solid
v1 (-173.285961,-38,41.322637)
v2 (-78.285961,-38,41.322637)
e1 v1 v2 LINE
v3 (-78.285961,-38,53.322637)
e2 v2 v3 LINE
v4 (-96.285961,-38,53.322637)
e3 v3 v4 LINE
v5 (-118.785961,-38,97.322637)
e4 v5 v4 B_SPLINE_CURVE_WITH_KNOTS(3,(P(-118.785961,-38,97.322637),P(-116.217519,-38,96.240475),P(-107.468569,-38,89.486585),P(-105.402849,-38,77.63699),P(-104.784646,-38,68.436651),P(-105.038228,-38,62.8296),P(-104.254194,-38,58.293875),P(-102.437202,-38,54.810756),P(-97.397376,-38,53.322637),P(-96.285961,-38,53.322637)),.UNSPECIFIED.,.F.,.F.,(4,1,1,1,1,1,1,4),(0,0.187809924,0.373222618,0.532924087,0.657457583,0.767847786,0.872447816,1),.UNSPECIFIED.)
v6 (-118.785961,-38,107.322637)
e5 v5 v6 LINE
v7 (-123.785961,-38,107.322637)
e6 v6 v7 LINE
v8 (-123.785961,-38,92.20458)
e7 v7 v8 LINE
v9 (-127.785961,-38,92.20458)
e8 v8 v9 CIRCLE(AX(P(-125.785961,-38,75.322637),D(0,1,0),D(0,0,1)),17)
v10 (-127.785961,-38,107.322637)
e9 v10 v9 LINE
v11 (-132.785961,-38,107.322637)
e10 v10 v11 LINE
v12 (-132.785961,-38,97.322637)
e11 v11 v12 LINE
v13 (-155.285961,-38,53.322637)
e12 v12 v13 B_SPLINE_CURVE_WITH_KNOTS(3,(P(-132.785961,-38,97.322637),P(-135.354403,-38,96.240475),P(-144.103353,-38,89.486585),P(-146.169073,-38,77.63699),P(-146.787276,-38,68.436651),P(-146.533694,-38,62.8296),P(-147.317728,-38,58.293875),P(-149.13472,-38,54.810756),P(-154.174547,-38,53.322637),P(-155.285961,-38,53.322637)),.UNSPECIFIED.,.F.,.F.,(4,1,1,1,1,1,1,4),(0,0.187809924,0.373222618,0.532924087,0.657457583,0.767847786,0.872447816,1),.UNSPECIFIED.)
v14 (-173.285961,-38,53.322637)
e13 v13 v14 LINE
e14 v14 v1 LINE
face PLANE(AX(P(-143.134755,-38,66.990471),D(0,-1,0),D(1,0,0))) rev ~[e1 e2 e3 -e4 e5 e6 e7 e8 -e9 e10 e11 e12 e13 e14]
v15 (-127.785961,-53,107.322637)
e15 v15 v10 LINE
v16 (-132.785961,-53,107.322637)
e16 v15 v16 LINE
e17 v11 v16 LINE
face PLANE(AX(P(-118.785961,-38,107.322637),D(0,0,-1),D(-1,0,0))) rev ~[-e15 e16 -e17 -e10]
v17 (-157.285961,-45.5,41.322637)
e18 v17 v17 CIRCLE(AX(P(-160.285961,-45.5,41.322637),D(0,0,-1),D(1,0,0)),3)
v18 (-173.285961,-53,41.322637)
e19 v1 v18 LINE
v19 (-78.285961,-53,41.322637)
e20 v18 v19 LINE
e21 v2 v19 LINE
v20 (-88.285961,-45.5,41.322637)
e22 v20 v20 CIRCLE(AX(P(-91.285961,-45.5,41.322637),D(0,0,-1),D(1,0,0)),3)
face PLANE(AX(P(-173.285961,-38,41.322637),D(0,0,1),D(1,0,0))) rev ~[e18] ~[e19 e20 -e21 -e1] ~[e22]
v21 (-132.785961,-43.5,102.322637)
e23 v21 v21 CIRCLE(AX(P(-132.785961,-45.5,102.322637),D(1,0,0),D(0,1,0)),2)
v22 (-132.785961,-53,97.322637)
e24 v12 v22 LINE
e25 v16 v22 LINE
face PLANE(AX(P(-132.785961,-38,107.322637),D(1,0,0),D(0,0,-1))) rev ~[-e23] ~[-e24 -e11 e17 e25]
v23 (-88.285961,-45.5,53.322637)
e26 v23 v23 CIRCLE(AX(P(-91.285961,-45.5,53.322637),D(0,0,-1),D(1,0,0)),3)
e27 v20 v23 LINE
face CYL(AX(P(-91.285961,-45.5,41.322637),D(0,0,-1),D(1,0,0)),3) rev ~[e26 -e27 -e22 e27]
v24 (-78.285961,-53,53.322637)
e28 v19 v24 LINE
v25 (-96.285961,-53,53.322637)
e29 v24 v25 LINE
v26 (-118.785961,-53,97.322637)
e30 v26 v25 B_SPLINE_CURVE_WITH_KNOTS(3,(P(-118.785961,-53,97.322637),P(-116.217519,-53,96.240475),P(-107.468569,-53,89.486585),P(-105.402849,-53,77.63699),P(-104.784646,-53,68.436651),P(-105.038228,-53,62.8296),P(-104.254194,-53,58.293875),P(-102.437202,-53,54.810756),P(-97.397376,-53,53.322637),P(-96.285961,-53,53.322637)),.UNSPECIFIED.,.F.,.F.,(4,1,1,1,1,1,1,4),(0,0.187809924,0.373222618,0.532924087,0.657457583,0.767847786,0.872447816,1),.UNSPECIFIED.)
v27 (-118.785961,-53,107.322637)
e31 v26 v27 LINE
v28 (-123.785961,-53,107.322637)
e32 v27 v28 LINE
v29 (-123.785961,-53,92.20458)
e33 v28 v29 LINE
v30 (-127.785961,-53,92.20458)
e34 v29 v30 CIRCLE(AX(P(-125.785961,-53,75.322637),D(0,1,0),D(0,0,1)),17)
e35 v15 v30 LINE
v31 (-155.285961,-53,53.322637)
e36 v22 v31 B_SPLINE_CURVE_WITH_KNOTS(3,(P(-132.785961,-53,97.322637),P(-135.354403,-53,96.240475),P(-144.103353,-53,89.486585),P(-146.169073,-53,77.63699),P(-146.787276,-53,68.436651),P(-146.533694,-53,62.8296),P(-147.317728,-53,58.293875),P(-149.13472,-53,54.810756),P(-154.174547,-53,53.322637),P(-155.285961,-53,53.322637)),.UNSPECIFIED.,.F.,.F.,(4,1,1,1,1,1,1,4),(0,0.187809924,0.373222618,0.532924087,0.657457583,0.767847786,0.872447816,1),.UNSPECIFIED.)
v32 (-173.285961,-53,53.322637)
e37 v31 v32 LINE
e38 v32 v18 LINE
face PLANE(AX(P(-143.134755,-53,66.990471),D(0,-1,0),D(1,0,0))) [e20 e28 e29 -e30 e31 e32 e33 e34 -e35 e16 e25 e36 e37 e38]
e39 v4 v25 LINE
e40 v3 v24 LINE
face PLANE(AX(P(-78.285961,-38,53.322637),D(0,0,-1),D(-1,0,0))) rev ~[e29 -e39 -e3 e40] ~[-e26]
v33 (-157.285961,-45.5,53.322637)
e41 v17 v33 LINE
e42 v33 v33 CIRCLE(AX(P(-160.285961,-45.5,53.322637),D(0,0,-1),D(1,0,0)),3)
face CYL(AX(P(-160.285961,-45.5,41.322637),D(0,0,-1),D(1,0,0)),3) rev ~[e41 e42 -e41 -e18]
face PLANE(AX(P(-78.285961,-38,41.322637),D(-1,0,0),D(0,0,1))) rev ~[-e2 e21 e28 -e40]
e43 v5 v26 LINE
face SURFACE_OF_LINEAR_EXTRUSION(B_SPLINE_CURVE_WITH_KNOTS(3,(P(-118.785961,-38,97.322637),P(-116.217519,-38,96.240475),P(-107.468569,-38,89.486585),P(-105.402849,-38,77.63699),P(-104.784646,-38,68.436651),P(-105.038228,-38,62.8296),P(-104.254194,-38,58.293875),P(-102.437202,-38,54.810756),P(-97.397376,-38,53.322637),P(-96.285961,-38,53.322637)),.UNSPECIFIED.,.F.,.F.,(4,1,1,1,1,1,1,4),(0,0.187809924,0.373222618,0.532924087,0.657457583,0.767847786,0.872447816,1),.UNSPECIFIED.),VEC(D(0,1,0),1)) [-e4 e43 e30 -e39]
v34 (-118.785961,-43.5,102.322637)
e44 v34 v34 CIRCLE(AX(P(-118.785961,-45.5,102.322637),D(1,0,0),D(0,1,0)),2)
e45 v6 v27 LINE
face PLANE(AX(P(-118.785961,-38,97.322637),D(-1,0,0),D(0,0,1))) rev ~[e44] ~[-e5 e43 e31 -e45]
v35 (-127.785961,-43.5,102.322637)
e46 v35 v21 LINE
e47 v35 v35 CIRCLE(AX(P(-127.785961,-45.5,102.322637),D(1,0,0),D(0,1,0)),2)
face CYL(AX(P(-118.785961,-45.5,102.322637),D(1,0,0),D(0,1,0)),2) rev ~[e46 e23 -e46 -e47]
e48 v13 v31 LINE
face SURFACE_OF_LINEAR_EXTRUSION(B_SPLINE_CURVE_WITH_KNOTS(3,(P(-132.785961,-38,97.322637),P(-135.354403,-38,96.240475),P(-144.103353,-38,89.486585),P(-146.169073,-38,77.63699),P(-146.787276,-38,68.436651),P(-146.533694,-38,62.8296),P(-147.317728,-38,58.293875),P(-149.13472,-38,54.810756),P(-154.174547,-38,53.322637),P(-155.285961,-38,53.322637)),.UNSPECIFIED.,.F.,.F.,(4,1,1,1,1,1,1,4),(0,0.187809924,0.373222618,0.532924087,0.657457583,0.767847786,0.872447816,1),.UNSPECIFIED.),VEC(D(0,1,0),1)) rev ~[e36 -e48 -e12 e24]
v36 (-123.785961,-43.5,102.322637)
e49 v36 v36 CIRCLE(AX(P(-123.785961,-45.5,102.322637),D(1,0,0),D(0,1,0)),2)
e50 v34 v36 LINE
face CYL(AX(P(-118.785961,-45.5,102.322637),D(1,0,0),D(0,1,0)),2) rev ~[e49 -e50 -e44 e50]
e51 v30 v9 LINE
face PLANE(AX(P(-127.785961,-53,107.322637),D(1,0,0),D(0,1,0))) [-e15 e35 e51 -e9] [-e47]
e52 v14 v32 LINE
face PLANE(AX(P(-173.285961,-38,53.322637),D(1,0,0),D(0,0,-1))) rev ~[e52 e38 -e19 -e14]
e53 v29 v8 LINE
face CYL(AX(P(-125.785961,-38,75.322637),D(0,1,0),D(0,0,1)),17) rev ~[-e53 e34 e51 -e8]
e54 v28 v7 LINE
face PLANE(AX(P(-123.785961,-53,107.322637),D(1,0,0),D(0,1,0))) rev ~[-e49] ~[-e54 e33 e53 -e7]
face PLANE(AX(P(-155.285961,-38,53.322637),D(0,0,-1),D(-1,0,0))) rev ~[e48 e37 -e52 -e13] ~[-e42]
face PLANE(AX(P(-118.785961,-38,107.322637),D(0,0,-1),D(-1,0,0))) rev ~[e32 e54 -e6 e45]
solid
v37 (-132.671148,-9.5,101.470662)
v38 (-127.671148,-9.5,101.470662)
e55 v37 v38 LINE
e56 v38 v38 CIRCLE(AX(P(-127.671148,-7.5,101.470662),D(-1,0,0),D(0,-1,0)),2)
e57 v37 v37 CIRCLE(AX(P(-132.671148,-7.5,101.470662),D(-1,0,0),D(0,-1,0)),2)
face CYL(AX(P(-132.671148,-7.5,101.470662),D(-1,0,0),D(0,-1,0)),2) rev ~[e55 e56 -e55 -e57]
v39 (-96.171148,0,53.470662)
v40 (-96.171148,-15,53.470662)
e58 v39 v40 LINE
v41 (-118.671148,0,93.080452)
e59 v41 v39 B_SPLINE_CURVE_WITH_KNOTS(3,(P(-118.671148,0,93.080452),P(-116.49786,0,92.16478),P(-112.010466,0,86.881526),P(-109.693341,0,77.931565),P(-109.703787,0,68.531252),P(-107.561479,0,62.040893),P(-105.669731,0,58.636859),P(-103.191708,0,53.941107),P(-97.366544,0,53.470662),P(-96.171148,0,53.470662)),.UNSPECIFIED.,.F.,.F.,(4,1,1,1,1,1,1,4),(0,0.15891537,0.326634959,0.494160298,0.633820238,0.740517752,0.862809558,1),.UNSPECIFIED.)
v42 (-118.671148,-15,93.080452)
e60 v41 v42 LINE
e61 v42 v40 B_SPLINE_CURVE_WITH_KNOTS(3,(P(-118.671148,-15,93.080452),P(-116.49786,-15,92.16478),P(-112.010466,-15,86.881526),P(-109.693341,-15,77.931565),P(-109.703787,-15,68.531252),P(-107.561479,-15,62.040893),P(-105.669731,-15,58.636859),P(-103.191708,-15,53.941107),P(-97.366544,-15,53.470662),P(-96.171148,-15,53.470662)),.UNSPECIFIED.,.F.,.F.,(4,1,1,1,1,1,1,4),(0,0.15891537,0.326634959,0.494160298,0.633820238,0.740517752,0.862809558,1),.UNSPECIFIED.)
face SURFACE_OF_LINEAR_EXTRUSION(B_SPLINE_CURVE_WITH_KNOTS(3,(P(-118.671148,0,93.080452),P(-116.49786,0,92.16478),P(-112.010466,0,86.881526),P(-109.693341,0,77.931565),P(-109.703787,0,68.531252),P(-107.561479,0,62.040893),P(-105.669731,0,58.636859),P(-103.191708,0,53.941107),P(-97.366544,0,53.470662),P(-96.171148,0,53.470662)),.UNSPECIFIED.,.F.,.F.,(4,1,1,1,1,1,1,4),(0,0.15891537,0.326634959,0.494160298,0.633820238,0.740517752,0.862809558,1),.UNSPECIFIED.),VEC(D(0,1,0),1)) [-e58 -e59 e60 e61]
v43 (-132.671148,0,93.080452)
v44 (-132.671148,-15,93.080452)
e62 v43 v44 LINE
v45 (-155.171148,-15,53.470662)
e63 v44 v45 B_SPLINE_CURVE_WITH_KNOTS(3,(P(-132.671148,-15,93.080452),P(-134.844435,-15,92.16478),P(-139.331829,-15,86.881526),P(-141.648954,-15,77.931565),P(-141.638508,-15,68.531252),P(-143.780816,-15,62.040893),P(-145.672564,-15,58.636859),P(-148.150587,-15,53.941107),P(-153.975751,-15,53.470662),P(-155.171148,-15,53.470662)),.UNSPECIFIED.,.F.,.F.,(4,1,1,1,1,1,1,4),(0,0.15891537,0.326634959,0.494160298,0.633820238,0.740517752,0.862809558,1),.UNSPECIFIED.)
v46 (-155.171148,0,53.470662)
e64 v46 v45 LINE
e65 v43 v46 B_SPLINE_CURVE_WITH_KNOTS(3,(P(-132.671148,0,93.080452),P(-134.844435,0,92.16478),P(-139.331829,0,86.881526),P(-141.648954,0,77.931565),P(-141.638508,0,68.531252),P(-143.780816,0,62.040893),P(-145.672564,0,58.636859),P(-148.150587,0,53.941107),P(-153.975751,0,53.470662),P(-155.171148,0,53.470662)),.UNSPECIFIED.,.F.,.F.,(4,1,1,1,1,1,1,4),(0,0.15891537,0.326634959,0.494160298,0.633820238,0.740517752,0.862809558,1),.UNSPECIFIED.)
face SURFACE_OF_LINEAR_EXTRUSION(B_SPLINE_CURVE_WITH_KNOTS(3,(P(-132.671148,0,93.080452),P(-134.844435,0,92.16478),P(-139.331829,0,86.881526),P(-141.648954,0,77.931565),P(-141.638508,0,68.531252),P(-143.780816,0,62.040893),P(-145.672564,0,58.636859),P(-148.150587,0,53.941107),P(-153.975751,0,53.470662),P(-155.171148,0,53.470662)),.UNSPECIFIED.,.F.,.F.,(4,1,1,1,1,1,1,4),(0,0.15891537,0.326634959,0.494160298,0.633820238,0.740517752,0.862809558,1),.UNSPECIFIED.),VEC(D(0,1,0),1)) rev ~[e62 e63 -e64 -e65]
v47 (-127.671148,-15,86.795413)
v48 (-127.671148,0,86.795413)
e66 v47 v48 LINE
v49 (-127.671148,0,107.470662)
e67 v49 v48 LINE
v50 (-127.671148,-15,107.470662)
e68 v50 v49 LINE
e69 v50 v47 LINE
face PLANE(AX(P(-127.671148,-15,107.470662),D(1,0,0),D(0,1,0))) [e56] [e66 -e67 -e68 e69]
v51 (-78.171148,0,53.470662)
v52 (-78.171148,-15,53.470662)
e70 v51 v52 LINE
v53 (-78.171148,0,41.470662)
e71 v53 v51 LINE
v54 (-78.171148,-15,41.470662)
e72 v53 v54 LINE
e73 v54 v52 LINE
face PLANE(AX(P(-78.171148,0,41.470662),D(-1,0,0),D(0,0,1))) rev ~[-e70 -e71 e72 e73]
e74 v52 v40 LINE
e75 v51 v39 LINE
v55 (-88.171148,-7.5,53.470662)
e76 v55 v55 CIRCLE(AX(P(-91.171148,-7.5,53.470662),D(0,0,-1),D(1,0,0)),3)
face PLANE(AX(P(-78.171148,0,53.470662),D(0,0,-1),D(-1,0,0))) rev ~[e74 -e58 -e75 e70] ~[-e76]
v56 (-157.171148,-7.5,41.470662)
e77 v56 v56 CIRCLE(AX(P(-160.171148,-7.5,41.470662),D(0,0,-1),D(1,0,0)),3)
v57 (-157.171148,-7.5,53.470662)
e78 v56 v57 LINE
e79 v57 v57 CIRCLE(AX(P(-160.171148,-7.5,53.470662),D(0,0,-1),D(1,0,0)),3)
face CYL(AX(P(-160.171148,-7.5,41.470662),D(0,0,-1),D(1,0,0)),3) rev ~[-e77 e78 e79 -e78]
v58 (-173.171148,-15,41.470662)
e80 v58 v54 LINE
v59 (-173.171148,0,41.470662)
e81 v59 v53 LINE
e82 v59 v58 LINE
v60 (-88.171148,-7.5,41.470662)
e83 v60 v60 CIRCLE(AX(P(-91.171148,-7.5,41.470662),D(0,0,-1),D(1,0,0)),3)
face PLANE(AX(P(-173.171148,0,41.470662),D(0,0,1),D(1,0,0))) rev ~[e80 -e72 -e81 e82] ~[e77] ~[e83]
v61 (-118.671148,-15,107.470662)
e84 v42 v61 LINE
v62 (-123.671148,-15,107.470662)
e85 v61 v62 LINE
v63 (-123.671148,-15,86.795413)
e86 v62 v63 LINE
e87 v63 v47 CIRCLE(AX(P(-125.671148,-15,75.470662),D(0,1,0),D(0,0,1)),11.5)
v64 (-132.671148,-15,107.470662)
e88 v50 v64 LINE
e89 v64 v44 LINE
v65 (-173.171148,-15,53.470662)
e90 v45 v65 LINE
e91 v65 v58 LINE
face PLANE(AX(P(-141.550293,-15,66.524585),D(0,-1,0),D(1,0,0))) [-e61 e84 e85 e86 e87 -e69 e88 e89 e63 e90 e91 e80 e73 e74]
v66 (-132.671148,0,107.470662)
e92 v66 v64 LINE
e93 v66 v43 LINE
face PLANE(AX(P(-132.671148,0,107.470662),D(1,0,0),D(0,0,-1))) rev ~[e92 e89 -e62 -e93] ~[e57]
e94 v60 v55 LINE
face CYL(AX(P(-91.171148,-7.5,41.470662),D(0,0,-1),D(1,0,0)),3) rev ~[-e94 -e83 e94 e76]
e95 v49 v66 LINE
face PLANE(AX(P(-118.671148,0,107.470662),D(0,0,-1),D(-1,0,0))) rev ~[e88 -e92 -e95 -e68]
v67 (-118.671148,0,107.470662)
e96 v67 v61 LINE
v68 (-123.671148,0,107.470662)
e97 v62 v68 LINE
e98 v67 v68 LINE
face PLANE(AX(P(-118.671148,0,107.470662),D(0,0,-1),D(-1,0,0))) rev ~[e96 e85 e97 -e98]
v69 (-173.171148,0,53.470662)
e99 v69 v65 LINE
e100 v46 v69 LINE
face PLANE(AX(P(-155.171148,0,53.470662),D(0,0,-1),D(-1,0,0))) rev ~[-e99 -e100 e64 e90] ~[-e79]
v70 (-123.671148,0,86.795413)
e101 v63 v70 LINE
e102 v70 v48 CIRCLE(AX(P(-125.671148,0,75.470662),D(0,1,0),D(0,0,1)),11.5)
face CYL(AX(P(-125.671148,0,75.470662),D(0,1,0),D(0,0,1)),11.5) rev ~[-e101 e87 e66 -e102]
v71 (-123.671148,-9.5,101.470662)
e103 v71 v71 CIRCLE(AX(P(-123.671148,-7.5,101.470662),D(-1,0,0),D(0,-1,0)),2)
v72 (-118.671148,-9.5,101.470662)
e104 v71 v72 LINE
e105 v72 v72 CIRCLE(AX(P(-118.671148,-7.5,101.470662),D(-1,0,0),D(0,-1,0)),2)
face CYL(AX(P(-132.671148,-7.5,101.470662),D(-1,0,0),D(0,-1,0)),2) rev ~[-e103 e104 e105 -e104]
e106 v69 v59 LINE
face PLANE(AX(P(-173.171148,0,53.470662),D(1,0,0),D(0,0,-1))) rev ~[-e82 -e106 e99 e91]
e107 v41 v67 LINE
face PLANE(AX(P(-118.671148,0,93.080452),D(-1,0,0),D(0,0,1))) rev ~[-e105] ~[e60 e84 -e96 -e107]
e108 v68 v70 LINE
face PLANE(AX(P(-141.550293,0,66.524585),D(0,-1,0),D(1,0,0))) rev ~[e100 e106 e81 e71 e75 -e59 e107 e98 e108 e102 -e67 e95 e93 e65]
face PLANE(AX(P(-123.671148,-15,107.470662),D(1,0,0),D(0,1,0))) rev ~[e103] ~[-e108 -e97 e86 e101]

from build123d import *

# Parameters (mm, degrees)
F1_DEPTH  = 15
F3_W      = 4
F3_H      = 15
F4_DEPTH  = 25
F5_R      = 3
F6_DEPTH  = 25
F7_R      = 2
F8_DEPTH  = 25
F10_DEPTH = 15
F11_R     = 3
F12_DEPTH = 25
F13_W     = 4
F13_H     = 15
F14_DEPTH = 25
F15_R     = 2
F16_DEPTH = 25


# Not quite as in the source:
# - a feature names something its author has since deleted; it is built from what else it names


with BuildPart() as f1:
    # F0 (on Front) → F1 (new body)
    with BuildSketch(Plane.XZ):
        with BuildLine():
            Line((-125.6711477041, 86.9706617594), (-125.6711477041, 107.4706617594))
            Line((-125.6711477041, 107.4706617594), (-132.6711477041, 107.4706617594))
            Line((-132.6711477041, 107.4706617594), (-132.6711477041, 93.0804520496))
            add(Edge.make_bspline(
                [(-132.6711477041, 93.0804520496), (-134.8444351683, 92.1647803788), (-139.3318293406, 86.8815258397), (-141.6489540104, 77.9315652386), (-141.6385080687, 68.53125191), (-143.7808164235, 62.0408932683), (-145.6725641316, 58.6368592184), (-148.1505873732, 53.9411069546), (-153.9757510035, 53.4706617594), (-155.1711477041, 53.4706617594)],
                knots=[0, 0, 0, 0, 0.1589153696, 0.3266349591, 0.4941602985, 0.6338202377, 0.7405177517, 0.8628095578, 1, 1, 1, 1], degree=3))
            Line((-155.1711477041, 53.4706617594), (-173.1711477041, 53.4706617594))
            Line((-173.1711477041, 53.4706617594), (-173.1711477041, 41.4706617594))
            Line((-173.1711477041, 41.4706617594), (-125.6711477041, 41.4706617594))
            Line((-125.6711477041, 41.4706617594), (-125.6711477041, 63.9706617594))
            ThreePointArc((-125.6711477041, 63.9706617594), (-137.1711477041, 75.4706617594), (-125.6711477041, 86.9706617594))
        make_face()
        with BuildLine():
            Line((-118.6711477041, 107.4706617594), (-125.6711477041, 107.4706617594))
            Line((-125.6711477041, 107.4706617594), (-125.6711477041, 86.9706617594))
            ThreePointArc((-125.6711477041, 86.9706617594), (-114.1711477041, 75.4706617594), (-125.6711477041, 63.9706617594))
            Line((-125.6711477041, 63.9706617594), (-125.6711477041, 41.4706617594))
            Line((-125.6711477041, 41.4706617594), (-78.1711477041, 41.4706617594))
            Line((-78.1711477041, 41.4706617594), (-78.1711477041, 53.4706617594))
            Line((-78.1711477041, 53.4706617594), (-96.1711477041, 53.4706617594))
            add(Edge.make_bspline(
                [(-118.6711477041, 93.0804520496), (-116.49786024, 92.1647803788), (-112.0104660676, 86.8815258397), (-109.6933413979, 77.9315652386), (-109.7037873395, 68.53125191), (-107.5614789847, 62.0408932683), (-105.6697312766, 58.6368592184), (-103.191708035, 53.9411069546), (-97.3665444048, 53.4706617594), (-96.1711477041, 53.4706617594)],
                knots=[0, 0, 0, 0, 0.1589153696, 0.3266349591, 0.4941602985, 0.6338202377, 0.7405177517, 0.8628095578, 1, 1, 1, 1], degree=3))
            Line((-118.6711477041, 93.0804520496), (-118.6711477041, 107.4706617594))
        make_face()
    extrude(amount=F1_DEPTH)

    # F3 (on face) → F4 (cut)
    with BuildSketch(Plane.XY.offset(107.4706617594)):
        with Locations((-125.6711477041, -7.5)):
            Rectangle(F3_W, F3_H)
    extrude(amount=-F4_DEPTH, mode=Mode.SUBTRACT)

    # F5 (on face) → F6 (cut)
    with BuildSketch(Plane(origin=(0, 0, 41.4706617594), x_dir=(1, 0, 0), z_dir=(0, 0, -1))):
        with Locations((-160.1711477041, 7.5)):
            Circle(F5_R)
        with Locations((-91.1711477041, 7.5)):
            Circle(F5_R)
    extrude(amount=-F6_DEPTH, mode=Mode.SUBTRACT)

    # F7 (on face) → F8 (cut)
    with BuildSketch(Plane(origin=(-132.6711477041, 0, 0), x_dir=(0, -1, 0), z_dir=(-1, 0, 0))):
        with Locations((7.5, 101.4706617594)):
            Circle(F7_R)
    extrude(amount=-F8_DEPTH, mode=Mode.SUBTRACT)


with BuildPart() as f10:
    # F9 (on offset) → F10 (new body)
    with BuildSketch(Plane.XZ.offset(38)):
        with BuildLine():
            Line((-125.7859611511, 92.3226373494), (-125.7859611511, 107.3226373494))
            Line((-125.7859611511, 107.3226373494), (-132.7859611511, 107.3226373494))
            Line((-132.7859611511, 107.3226373494), (-132.7859611511, 97.3226373494))
            add(Edge.make_bspline(
                [(-132.7859611511, 97.3226373494), (-135.3544034247, 96.2404750185), (-144.1033534904, 89.486584983), (-146.1690728794, 77.6369899314), (-146.7872760168, 68.4366512578), (-146.5336940779, 62.8295997289), (-147.3177284091, 58.2938754382), (-149.1347203045, 54.8107556411), (-154.1745465523, 53.3226373494), (-155.2859611511, 53.3226373494)],
                knots=[0, 0, 0, 0, 0.1878099238, 0.3732226175, 0.5329240866, 0.6574575834, 0.7678477858, 0.8724478156, 1, 1, 1, 1], degree=3))
            Line((-155.2859611511, 53.3226373494), (-173.2859611511, 53.3226373494))
            Line((-173.2859611511, 53.3226373494), (-173.2859611511, 41.3226373494))
            Line((-173.2859611511, 41.3226373494), (-125.7859611511, 41.3226373494))
            Line((-125.7859611511, 41.3226373494), (-125.7859611511, 58.3226373494))
            ThreePointArc((-125.7859611511, 58.3226373494), (-142.7859611511, 75.3226373494), (-125.7859611511, 92.3226373494))
        make_face()
        with BuildLine():
            Line((-118.7859611511, 107.3226373494), (-125.7859611511, 107.3226373494))
            Line((-125.7859611511, 107.3226373494), (-125.7859611511, 92.3226373494))
            ThreePointArc((-125.7859611511, 92.3226373494), (-108.7859611511, 75.3226373494), (-125.7859611511, 58.3226373494))
            Line((-125.7859611511, 58.3226373494), (-125.7859611511, 41.3226373494))
            Line((-125.7859611511, 41.3226373494), (-78.2859611511, 41.3226373494))
            Line((-78.2859611511, 41.3226373494), (-78.2859611511, 53.3226373494))
            Line((-78.2859611511, 53.3226373494), (-96.2859611511, 53.3226373494))
            add(Edge.make_bspline(
                [(-118.7859611511, 97.3226373494), (-116.2175188776, 96.2404750185), (-107.4685688118, 89.486584983), (-105.4028494228, 77.6369899314), (-104.7846462854, 68.4366512578), (-105.0382282244, 62.8295997289), (-104.2541938932, 58.2938754382), (-102.4372019978, 54.8107556411), (-97.39737575, 53.3226373494), (-96.2859611511, 53.3226373494)],
                knots=[0, 0, 0, 0, 0.1878099238, 0.3732226175, 0.5329240866, 0.6574575834, 0.7678477858, 0.8724478156, 1, 1, 1, 1], degree=3))
            Line((-118.7859611511, 97.3226373494), (-118.7859611511, 107.3226373494))
        make_face()
    extrude(amount=F10_DEPTH)

    # F11 (on face) → F12 (cut)
    with BuildSketch(Plane(origin=(0, 0, 41.3226373494), x_dir=(1, 0, 0), z_dir=(0, 0, -1))):
        with Locations((-160.2859611511, 45.5)):
            Circle(F11_R)
        with Locations((-91.2859611511, 45.5)):
            Circle(F11_R)
    extrude(amount=-F12_DEPTH, mode=Mode.SUBTRACT)

    # F13 (on face) → F14 (cut)
    with BuildSketch(Plane.XY.offset(107.3226373494)):
        with Locations((-125.7859611511, -45.5)):
            Rectangle(F13_W, F13_H)
    extrude(amount=-F14_DEPTH, mode=Mode.SUBTRACT)

    # F15 (on face) → F16 (cut)
    with BuildSketch(Plane.YZ.offset(-118.7859611511)):
        with Locations((-45.5, 102.3226373494)):
            Circle(F15_R)
    extrude(amount=-F16_DEPTH, mode=Mode.SUBTRACT)


solid = Compound([f1.part, f10.part])
